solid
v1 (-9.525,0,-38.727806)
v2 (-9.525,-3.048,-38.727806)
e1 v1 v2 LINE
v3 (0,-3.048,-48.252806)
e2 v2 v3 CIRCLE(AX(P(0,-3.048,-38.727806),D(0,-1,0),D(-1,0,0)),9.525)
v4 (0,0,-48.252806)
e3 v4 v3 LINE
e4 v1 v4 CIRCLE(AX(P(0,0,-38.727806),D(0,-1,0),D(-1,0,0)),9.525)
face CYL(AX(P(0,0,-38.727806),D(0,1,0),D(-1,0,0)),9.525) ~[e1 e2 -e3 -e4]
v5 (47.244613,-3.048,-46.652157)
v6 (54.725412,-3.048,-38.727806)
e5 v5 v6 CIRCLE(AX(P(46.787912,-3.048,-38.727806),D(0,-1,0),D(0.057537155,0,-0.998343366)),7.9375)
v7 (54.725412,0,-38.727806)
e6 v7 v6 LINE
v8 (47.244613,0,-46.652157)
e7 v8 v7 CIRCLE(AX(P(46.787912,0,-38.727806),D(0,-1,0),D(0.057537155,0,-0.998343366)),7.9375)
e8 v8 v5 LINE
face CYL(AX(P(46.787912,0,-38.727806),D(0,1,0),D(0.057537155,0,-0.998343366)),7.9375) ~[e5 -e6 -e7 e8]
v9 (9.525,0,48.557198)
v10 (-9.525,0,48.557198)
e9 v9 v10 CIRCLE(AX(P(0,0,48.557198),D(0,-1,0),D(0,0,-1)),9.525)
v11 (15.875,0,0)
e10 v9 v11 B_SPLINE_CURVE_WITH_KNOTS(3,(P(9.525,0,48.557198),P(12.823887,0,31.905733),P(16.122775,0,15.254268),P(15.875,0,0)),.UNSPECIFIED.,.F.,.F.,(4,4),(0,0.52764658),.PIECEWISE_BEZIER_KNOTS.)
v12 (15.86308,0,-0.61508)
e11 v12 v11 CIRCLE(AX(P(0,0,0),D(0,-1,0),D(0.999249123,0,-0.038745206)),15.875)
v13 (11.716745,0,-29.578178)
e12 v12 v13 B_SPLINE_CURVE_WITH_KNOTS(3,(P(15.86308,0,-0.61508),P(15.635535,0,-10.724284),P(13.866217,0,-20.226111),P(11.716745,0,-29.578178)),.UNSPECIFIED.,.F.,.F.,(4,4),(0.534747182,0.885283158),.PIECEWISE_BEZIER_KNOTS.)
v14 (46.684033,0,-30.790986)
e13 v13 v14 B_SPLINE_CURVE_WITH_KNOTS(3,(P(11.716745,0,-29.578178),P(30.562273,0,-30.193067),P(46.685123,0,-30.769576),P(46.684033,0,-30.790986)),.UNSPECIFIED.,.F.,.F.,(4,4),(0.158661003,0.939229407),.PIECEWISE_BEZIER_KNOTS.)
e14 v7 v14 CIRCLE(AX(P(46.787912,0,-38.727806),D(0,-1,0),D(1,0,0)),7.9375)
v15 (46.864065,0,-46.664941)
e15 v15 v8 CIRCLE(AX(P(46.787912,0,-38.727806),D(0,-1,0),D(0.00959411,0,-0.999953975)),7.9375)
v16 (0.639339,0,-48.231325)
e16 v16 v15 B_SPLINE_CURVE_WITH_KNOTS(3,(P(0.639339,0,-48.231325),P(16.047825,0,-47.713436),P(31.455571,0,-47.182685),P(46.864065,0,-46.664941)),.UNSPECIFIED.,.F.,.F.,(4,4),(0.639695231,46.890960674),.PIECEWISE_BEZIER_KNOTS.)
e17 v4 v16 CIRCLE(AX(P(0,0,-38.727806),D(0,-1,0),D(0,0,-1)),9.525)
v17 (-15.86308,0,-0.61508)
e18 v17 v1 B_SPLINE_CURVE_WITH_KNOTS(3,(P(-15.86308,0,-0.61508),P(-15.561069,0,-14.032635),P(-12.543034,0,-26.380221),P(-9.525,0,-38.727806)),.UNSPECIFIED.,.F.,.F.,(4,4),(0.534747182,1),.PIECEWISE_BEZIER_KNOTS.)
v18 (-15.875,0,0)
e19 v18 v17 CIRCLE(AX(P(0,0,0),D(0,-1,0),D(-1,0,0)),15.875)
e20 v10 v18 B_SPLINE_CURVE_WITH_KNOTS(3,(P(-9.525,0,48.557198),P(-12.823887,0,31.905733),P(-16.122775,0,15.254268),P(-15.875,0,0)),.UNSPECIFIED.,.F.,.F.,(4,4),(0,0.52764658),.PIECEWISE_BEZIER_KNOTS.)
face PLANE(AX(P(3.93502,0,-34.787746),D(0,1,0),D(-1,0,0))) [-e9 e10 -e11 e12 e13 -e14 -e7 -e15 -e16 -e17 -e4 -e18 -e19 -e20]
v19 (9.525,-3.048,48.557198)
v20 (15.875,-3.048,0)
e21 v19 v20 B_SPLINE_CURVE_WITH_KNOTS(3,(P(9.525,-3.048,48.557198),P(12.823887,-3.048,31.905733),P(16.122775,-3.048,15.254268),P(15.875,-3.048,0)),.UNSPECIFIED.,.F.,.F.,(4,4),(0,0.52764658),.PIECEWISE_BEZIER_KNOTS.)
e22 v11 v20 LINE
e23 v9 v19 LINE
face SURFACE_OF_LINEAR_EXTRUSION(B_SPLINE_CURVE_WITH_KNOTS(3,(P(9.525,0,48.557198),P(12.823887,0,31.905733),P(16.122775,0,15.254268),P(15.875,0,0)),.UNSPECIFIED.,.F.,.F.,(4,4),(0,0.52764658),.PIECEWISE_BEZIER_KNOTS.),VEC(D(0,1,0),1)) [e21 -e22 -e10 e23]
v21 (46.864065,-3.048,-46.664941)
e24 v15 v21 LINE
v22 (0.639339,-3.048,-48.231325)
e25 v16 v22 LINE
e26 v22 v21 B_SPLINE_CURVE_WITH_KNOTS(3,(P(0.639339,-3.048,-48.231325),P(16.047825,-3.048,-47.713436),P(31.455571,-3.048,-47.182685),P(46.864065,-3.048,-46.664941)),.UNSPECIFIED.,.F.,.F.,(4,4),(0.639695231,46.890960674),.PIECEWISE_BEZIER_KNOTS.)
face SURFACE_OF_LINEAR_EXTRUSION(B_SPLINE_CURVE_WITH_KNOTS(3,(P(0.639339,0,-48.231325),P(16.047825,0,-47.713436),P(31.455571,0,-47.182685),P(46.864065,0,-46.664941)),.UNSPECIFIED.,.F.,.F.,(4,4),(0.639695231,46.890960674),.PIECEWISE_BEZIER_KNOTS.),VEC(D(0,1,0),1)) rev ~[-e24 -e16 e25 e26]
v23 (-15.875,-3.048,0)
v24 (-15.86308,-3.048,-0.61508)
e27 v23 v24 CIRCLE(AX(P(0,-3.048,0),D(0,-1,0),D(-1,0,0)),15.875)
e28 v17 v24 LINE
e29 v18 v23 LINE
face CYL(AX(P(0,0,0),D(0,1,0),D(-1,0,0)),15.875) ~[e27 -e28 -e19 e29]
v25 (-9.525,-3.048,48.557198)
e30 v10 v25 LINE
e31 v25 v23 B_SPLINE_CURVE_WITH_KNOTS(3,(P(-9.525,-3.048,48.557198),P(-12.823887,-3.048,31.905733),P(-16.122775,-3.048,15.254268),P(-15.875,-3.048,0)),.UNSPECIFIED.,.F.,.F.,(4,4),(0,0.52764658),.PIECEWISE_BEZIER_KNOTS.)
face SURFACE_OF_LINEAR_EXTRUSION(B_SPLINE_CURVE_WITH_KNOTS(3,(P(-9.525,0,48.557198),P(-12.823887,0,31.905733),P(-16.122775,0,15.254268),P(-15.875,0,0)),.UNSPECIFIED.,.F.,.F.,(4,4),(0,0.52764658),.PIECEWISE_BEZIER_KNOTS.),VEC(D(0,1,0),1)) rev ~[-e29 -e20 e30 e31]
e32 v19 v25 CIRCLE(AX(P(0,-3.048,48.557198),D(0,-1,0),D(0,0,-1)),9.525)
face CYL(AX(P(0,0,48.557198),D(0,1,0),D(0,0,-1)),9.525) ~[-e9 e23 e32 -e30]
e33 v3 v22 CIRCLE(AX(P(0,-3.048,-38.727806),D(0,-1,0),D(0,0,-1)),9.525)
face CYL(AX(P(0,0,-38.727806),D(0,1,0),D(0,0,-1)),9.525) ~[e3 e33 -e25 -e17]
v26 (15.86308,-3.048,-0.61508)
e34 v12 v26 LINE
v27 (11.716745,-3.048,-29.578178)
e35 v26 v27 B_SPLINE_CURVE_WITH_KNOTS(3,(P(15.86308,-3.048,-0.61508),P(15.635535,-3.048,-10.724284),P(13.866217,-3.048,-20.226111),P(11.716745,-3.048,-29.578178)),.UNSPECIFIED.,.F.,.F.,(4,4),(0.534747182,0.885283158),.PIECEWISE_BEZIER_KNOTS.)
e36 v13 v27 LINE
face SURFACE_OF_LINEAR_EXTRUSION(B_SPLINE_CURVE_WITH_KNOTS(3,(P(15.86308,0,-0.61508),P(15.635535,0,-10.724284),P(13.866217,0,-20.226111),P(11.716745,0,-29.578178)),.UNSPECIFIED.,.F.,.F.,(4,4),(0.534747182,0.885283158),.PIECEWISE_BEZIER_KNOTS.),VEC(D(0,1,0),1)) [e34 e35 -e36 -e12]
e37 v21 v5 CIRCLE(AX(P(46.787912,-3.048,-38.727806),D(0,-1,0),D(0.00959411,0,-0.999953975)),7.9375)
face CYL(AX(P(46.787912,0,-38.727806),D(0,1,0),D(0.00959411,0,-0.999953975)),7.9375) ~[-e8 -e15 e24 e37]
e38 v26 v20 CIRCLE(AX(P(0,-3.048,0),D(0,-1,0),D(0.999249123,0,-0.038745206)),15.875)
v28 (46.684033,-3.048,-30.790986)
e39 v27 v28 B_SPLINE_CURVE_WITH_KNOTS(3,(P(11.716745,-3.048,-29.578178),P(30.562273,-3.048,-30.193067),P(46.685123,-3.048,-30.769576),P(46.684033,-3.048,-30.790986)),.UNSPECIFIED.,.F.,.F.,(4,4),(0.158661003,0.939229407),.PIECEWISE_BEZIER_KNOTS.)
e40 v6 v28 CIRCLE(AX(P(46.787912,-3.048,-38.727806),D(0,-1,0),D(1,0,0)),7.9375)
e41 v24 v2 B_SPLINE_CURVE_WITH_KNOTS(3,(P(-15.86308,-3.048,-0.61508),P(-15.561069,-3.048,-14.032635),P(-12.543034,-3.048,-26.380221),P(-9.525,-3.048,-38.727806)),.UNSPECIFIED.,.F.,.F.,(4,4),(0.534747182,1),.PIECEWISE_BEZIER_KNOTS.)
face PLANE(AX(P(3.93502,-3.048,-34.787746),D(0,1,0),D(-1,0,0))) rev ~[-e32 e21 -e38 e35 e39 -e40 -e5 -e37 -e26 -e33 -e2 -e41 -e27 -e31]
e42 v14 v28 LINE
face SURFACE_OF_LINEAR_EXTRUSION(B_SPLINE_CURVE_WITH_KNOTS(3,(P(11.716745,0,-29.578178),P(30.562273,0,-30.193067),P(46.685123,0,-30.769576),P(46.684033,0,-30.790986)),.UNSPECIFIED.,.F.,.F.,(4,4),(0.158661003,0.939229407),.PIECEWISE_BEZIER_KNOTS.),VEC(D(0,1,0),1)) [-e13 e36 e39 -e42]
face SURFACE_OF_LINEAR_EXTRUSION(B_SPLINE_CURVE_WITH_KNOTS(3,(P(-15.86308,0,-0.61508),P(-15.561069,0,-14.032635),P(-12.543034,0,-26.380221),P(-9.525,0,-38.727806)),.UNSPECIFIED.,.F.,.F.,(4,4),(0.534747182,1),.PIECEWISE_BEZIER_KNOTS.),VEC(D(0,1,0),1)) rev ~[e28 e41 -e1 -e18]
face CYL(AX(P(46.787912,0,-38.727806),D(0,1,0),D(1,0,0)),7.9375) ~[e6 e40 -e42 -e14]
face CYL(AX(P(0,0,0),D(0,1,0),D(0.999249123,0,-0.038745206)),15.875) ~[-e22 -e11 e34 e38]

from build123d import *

# Parameters (mm, degrees)
F1_DEPTH = 3.048


with BuildPart() as f1:
    # F0 (on Front) → F1 (new body)
    with BuildSketch(Plane.XZ):
        with BuildLine():
            add(Edge.make_bspline(
                [(0, -29.2028061362), (0.1994290432, -29.2090684708), (0.3988582249, -29.2153378493), (0.5982729839, -29.2216137104)],
                knots=[0, 0, 0, 0, 0.0080246695, 0.0080246695, 0.0080246695, 0.0080246695], degree=3))
            Line((0, -29.2028061362), (0, -38.7278061362))
            Line((0, -38.7278061362), (9.525, -38.7278061362))
            ThreePointArc((9.525, -38.7278061362), (6.9434924632, -32.2075655415), (0.5982729839, -29.2216137104))
        make_face()
        with BuildLine():
            ThreePointArc((-9.525, -38.7278061362), (-6.7351920908, -31.9926140454), (0, -29.2028061362))
            Line((0, -29.2028061362), (0, -15.875))
            ThreePointArc((0, -15.875), (-11.0057082375, -11.4407172498), (-15.8630798211, -0.6150801499))
            add(Edge.make_bspline(
                [(-15.8630798211, -0.6150801499), (-15.5610688303, -14.0326352056), (-12.5430344151, -26.3802206709), (-9.525, -38.7278061362)],
                knots=[0.5347471817, 0.5347471817, 0.5347471817, 0.5347471817, 1, 1, 1, 1], degree=3))
        make_face()
        with BuildLine():
            Line((0, -38.7278061362), (0, -29.2028061362))
            ThreePointArc((0, -29.2028061362), (-6.7351920908, -31.9926140454), (-9.525, -38.7278061362))
            ThreePointArc((-9.525, -38.7278061362), (-6.7351920908, -45.4629982271), (0, -48.2528061362))
            add(Edge.make_bspline(
                [(0, -48.2528061362), (0.2131130588, -48.2456482665), (0.4262259719, -48.2384878681), (0.6393387432, -48.2313250094)],
                knots=[0, 0, 0, 0, 0.6396952306, 0.6396952306, 0.6396952306, 0.6396952306], degree=3))
            ThreePointArc((0.6393387432, -48.2313250094), (6.957561589, -45.2330318614), (9.525, -38.7278061362))
            Line((9.525, -38.7278061362), (0, -38.7278061362))
        make_face()
        with BuildLine():
            Line((0, -15.875), (0, -29.2028061362))
            ThreePointArc((0, -29.2028061362), (0.2992842663, -29.2075091909), (0.5982729839, -29.2216137104))
            add(Edge.make_bspline(
                [(0.5982729839, -29.2216137104), (4.3416181778, -29.339422014), (8.0798811955, -29.4595146085), (11.716745228, -29.5781777813)],
                knots=[0.0080246695, 0.0080246695, 0.0080246695, 0.0080246695, 0.1586610028, 0.1586610028, 0.1586610028, 0.1586610028], degree=3))
            add(Edge.make_bspline(
                [(15.8630798211, -0.6150801499), (15.6355353264, -10.7242843795), (13.866216965, -20.2261112434), (11.7167452282, -29.578177782)],
                knots=[0.5347471817, 0.5347471817, 0.5347471817, 0.5347471817, 0.8852831578, 0.8852831578, 0.8852831578, 0.8852831578], degree=3))
            ThreePointArc((15.8630798211, -0.6150801499), (11.0057082375, -11.4407172498), (0, -15.875))
        make_face()
        with BuildLine():
            ThreePointArc((0.5982729839, -29.2216137104), (0.2992842663, -29.2075091909), (0, -29.2028061362))
            add(Edge.make_bspline(
                [(0, -29.2028061362), (0.1994290432, -29.2090684708), (0.3988582249, -29.2153378493), (0.5982729839, -29.2216137104)],
                knots=[0, 0, 0, 0, 0.0080246695, 0.0080246695, 0.0080246695, 0.0080246695], degree=3))
        make_face()
        with BuildLine():
            ThreePointArc((-15.8630798211, -0.6150801499), (-11.0057082375, -11.4407172498), (0, -15.875))
            Line((0, -15.875), (0, 0))
            Line((0, 0), (0, 15.875))
            ThreePointArc((0, 15.875), (-11.2253201513, 11.2253201513), (-15.875, 0))
            add(Edge.make_bspline(
                [(-15.875, 0), (-15.8716656679, -0.2052784728), (-15.8676890566, -0.4103039216), (-15.8630798211, -0.6150801499)],
                knots=[0.5276465798, 0.5276465798, 0.5276465798, 0.5276465798, 0.5347471817, 0.5347471817, 0.5347471817, 0.5347471817], degree=3))
        make_face()
        with BuildLine():
            Line((0, 0), (0, -15.875))
            ThreePointArc((0, -15.875), (11.0057082375, -11.4407172498), (15.8630798211, -0.6150801499))
            add(Edge.make_bspline(
                [(15.875, 0), (15.8716656679, -0.2052784728), (15.8676890566, -0.4103039216), (15.8630798211, -0.6150801499)],
                knots=[0.5276465798, 0.5276465798, 0.5276465798, 0.5276465798, 0.5347471817, 0.5347471817, 0.5347471817, 0.5347471817], degree=3))
            ThreePointArc((15.875, 0), (11.2253201513, 11.2253201513), (0, 15.875))
            Line((0, 15.875), (0, 0))
        make_face()
        with BuildLine():
            add(Edge.make_bspline(
                [(0.5982729839, -29.2216137104), (4.3416181778, -29.339422014), (8.0798811955, -29.4595146085), (11.716745228, -29.5781777813)],
                knots=[0.0080246695, 0.0080246695, 0.0080246695, 0.0080246695, 0.1586610028, 0.1586610028, 0.1586610028, 0.1586610028], degree=3))
            ThreePointArc((0.5982729839, -29.2216137104), (6.9434924632, -32.2075655415), (9.525, -38.7278061362))
            add(Edge.make_bspline(
                [(11.7167452282, -29.578177782), (11.0133064179, -32.63874678), (10.2691532089, -35.6832764581), (9.525, -38.7278061362)],
                knots=[0.8852831578, 0.8852831578, 0.8852831578, 0.8852831578, 1, 1, 1, 1], degree=3))
        make_face()
        with BuildLine():
            add(Edge.make_bspline(
                [(11.7167452282, -29.578177782), (11.0133064179, -32.63874678), (10.2691532089, -35.6832764581), (9.525, -38.7278061362)],
                knots=[0.8852831578, 0.8852831578, 0.8852831578, 0.8852831578, 1, 1, 1, 1], degree=3))
            Line((9.525, -38.7278061362), (38.8504122414, -38.7278061362))
            ThreePointArc((38.8504122414, -38.7278061362), (41.0703889722, -33.2220061112), (46.4885436218, -30.7959535986))
            add(Edge.make_bspline(
                [(46.6014932618, -30.7924955428), (46.5682462049, -30.7929887265), (46.5283758233, -30.7939133608), (46.4885436218, -30.7959535986)],
                knots=[0.9751953485, 0.9751953485, 0.9751953485, 0.9751953485, 1, 1, 1, 1], degree=3))
            ThreePointArc((46.6014932618, -30.7924955428), (46.6427611197, -30.7916334188), (46.684032903, -30.7909859082))
            add(Edge.make_bspline(
                [(11.716745228, -29.5781777813), (30.5622726651, -30.1930674385), (46.6851234184, -30.7695755158), (46.684032903, -30.7909859082)],
                knots=[0.1586610028, 0.1586610028, 0.1586610028, 0.1586610028, 0.9392294066, 0.9392294066, 0.9392294066, 0.9392294066], degree=3))
        make_face()
        with BuildLine():
            Line((38.8504122414, -38.7278061362), (9.525, -38.7278061362))
            ThreePointArc((9.525, -38.7278061362), (6.957561589, -45.2330318614), (0.6393387432, -48.2313250094))
            add(Edge.make_bspline(
                [(0.6393387432, -48.2313250094), (16.0478252892, -47.7134357647), (31.455570606, -47.182685244), (46.8640654981, -46.6649408164)],
                knots=[0.6396952306, 0.6396952306, 0.6396952306, 0.6396952306, 46.8909606742, 46.8909606742, 46.8909606742, 46.8909606742], degree=3))
            ThreePointArc((46.8640654981, -46.6649408164), (41.2022412981, -44.3673261834), (38.8504122414, -38.7278061362))
        make_face()
        with BuildLine():
            ThreePointArc((-15.875, 0), (-15.8720196755, -0.3075978225), (-15.8630798211, -0.6150801499))
            add(Edge.make_bspline(
                [(-15.875, 0), (-15.8716656679, -0.2052784728), (-15.8676890566, -0.4103039216), (-15.8630798211, -0.6150801499)],
                knots=[0.5276465798, 0.5276465798, 0.5276465798, 0.5276465798, 0.5347471817, 0.5347471817, 0.5347471817, 0.5347471817], degree=3))
        make_face()
        with BuildLine():
            add(Edge.make_bspline(
                [(15.875, 0), (15.8716656679, -0.2052784728), (15.8676890566, -0.4103039216), (15.8630798211, -0.6150801499)],
                knots=[0.5276465798, 0.5276465798, 0.5276465798, 0.5276465798, 0.5347471817, 0.5347471817, 0.5347471817, 0.5347471817], degree=3))
            ThreePointArc((15.8630798211, -0.6150801499), (15.8720196755, -0.3075978225), (15.875, 0))
        make_face()
        with BuildLine():
            add(Edge.make_bspline(
                [(0, -48.2528061362), (0.2131130588, -48.2456482665), (0.4262259719, -48.2384878681), (0.6393387432, -48.2313250094)],
                knots=[0, 0, 0, 0, 0.6396952306, 0.6396952306, 0.6396952306, 0.6396952306], degree=3))
            ThreePointArc((0, -48.2528061362), (0.3198497567, -48.2474343398), (0.6393387432, -48.2313250094))
        make_face()
        with BuildLine():
            ThreePointArc((46.4885436218, -30.7959535986), (41.0703889722, -33.2220061112), (38.8504122414, -38.7278061362))
            ThreePointArc((38.8504122414, -38.7278061362), (41.2022412981, -44.3673261834), (46.8640654981, -46.6649408164))
            add(Edge.make_bspline(
                [(46.8640654981, -46.6649408164), (46.9909147503, -46.6606785252), (47.1177640532, -46.6564171153), (47.2446134078, -46.6521566014)],
                knots=[46.8909606742, 46.8909606742, 46.8909606742, 46.8909606742, 47.2717206688, 47.2717206688, 47.2717206688, 47.2717206688], degree=3))
            ThreePointArc((47.2446134078, -46.6521566014), (52.5597824651, -44.1766060381), (54.7254122414, -38.7278061362))
            ThreePointArc((54.7254122414, -38.7278061362), (52.3637244693, -33.078538551), (46.684032903, -30.7909859082))
            add(Edge.make_bspline(
                [(46.684032903, -30.7909859082), (46.6839826557, -30.7919724263), (46.6497004182, -30.7917804424), (46.6014932618, -30.7924955428)],
                knots=[0.9392294066, 0.9392294066, 0.9392294066, 0.9392294066, 0.9751953485, 0.9751953485, 0.9751953485, 0.9751953485], degree=3))
            ThreePointArc((46.6014932618, -30.7924955428), (46.5450122879, -30.7940235666), (46.4885436218, -30.7959535986))
        make_face()
        with BuildLine():
            ThreePointArc((-15.875, 0), (-11.2253201513, 11.2253201513), (0, 15.875))
            Line((0, 15.875), (0, 39.0321981638))
            ThreePointArc((0, 39.0321981638), (-6.7351920908, 41.822006073), (-9.525, 48.5571981638))
            add(Edge.make_bspline(
                [(-9.525, 48.5571981638), (-12.8238873086, 31.9057330322), (-16.1227746172, 15.2542679006), (-15.875, 0)],
                knots=[0, 0, 0, 0, 0.5276465798, 0.5276465798, 0.5276465798, 0.5276465798], degree=3))
        make_face()
        with BuildLine():
            Line((0, 39.0321981638), (0, 15.875))
            ThreePointArc((0, 15.875), (11.2253201513, 11.2253201513), (15.875, 0))
            add(Edge.make_bspline(
                [(9.525, 48.5571981638), (12.8238873086, 31.9057330322), (16.1227746172, 15.2542679006), (15.875, 0)],
                knots=[0, 0, 0, 0, 0.5276465798, 0.5276465798, 0.5276465798, 0.5276465798], degree=3))
            ThreePointArc((9.525, 48.5571981638), (6.7351920908, 41.822006073), (0, 39.0321981638))
        make_face()
        with BuildLine():
            add(Edge.make_bspline(
                [(46.684032903, -30.7909859082), (46.6839826557, -30.7919724263), (46.6497004182, -30.7917804424), (46.6014932618, -30.7924955428)],
                knots=[0.9392294066, 0.9392294066, 0.9392294066, 0.9392294066, 0.9751953485, 0.9751953485, 0.9751953485, 0.9751953485], degree=3))
            ThreePointArc((46.684032903, -30.7909859082), (46.6427611197, -30.7916334188), (46.6014932618, -30.7924955428))
        make_face()
        with BuildLine():
            add(Edge.make_bspline(
                [(46.6014932618, -30.7924955428), (46.5682462049, -30.7929887265), (46.5283758233, -30.7939133608), (46.4885436218, -30.7959535986)],
                knots=[0.9751953485, 0.9751953485, 0.9751953485, 0.9751953485, 1, 1, 1, 1], degree=3))
            ThreePointArc((46.4885436218, -30.7959535986), (46.5450122879, -30.7940235666), (46.6014932618, -30.7924955428))
        make_face()
        with BuildLine():
            add(Edge.make_bspline(
                [(46.8640654981, -46.6649408164), (46.9909147503, -46.6606785252), (47.1177640532, -46.6564171153), (47.2446134078, -46.6521566014)],
                knots=[46.8909606742, 46.8909606742, 46.8909606742, 46.8909606742, 47.2717206688, 47.2717206688, 47.2717206688, 47.2717206688], degree=3))
            ThreePointArc((46.8640654981, -46.6649408164), (47.0544161215, -46.6608309019), (47.2446134078, -46.6521566014))
        make_face()
        with BuildLine():
            ThreePointArc((-9.525, 48.5571981638), (-6.7351920908, 41.822006073), (0, 39.0321981638))
            ThreePointArc((0, 39.0321981638), (6.7351920908, 41.822006073), (9.525, 48.5571981638))
            ThreePointArc((9.525, 48.5571981638), (0, 58.0821981638), (-9.525, 48.5571981638))
        make_face()
    extrude(amount=F1_DEPTH)


solid = f1.part
